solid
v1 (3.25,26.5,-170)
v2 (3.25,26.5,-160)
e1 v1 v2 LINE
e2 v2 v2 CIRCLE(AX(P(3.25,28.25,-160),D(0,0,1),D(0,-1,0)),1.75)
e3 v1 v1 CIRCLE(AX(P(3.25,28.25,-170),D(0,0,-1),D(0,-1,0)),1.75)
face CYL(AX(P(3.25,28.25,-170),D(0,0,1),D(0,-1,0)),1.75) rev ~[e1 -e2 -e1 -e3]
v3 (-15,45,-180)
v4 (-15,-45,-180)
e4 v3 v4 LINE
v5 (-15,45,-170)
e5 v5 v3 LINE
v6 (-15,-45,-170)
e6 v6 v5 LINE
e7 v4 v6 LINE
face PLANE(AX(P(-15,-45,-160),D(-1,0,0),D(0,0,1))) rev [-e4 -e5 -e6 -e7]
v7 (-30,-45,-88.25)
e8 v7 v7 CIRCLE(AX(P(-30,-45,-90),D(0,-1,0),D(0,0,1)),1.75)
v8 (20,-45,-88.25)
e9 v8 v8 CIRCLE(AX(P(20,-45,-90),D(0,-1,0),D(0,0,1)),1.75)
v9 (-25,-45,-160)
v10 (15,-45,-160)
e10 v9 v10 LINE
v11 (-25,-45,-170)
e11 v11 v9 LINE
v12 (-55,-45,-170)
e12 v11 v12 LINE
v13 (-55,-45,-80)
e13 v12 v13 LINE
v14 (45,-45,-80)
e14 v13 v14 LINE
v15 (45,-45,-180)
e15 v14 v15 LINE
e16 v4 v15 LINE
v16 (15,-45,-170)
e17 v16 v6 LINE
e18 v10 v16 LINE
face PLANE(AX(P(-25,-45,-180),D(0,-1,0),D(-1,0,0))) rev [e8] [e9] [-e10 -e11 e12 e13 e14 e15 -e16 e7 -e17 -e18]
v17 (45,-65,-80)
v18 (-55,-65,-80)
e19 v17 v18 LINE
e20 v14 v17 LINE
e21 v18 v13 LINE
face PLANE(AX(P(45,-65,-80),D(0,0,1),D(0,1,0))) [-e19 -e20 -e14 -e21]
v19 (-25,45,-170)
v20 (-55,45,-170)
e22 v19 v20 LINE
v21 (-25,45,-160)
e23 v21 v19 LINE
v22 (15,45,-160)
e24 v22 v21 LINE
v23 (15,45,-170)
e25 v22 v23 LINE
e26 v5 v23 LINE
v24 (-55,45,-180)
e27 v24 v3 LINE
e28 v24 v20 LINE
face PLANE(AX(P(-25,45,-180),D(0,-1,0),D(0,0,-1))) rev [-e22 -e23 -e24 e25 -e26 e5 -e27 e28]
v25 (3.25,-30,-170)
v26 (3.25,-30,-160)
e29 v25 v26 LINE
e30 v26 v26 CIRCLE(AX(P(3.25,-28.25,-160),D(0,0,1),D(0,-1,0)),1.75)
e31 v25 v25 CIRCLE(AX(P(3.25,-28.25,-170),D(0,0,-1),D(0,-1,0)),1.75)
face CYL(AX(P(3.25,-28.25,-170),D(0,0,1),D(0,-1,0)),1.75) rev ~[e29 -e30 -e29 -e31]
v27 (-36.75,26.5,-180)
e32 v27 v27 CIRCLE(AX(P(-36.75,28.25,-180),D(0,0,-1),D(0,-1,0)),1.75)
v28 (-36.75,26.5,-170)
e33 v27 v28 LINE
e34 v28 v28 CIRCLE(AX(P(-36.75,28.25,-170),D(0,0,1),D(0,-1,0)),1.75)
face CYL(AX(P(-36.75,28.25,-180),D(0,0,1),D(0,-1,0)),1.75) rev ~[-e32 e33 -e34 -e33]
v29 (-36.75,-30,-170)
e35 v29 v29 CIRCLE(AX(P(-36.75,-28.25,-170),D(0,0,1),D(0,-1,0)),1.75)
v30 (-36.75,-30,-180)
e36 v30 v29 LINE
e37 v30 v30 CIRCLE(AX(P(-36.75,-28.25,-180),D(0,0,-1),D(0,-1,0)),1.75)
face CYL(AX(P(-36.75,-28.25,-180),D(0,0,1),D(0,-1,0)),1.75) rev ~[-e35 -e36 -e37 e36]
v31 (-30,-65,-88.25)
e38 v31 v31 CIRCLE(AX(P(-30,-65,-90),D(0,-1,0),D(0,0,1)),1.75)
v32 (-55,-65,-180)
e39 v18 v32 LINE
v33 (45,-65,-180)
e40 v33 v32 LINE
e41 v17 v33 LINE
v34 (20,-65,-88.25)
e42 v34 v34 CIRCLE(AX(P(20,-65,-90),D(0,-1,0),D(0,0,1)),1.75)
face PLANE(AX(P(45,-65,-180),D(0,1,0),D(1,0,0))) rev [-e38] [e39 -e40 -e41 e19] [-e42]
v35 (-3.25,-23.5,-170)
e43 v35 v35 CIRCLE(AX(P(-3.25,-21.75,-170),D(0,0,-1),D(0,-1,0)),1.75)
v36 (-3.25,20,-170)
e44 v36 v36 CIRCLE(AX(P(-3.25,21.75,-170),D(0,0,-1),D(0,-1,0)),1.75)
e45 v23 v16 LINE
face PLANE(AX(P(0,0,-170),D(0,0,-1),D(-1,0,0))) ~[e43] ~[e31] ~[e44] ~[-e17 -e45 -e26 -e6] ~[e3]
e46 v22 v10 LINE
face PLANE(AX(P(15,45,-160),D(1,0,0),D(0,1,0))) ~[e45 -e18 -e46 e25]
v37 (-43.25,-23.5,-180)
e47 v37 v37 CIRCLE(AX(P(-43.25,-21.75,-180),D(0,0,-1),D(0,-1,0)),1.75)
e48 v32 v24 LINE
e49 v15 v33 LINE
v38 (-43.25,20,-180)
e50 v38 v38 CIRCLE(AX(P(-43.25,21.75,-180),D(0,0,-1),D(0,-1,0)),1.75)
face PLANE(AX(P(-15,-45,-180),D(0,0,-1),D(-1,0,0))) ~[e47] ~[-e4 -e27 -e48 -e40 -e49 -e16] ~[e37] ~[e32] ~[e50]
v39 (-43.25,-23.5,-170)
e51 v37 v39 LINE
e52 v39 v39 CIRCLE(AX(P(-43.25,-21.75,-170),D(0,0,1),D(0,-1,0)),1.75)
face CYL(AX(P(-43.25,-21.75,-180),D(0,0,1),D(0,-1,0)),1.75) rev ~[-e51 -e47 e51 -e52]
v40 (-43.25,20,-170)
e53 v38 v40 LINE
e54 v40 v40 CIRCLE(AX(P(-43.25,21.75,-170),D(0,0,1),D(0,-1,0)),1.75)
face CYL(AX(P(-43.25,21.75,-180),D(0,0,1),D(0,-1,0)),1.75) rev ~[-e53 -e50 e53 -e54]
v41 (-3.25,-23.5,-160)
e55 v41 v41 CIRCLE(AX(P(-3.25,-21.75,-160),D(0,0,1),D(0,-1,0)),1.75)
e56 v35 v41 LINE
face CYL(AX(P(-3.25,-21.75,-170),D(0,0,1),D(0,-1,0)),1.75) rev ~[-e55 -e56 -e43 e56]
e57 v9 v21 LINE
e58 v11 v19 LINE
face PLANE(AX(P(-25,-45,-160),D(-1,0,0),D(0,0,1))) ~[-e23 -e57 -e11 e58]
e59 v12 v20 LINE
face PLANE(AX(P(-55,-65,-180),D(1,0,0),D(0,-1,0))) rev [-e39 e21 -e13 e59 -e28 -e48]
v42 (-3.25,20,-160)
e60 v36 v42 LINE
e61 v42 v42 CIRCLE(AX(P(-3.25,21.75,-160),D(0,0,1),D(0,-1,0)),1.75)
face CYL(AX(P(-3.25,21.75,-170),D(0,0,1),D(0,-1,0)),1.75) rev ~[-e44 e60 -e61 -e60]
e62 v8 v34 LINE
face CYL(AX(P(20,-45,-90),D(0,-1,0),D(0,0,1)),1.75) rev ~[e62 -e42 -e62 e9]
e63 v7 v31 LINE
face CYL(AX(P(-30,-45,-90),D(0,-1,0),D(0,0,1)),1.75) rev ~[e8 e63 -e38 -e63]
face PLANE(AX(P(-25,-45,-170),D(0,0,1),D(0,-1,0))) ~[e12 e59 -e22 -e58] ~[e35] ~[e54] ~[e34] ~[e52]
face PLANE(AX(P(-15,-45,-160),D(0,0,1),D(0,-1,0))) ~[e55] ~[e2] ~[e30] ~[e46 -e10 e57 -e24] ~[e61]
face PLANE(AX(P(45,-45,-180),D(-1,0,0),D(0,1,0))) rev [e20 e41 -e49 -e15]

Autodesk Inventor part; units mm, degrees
ref_plane "YZ Plane" through (0, 0, 0) normal (1, 0, 0) x (0, 1, 0)
ref_plane "XZ Plane" through (0, 0, 0) normal (0, 1, 0) x (-1, 0, 0)
ref_plane "XY Plane" through (0, 0, 0) normal (0, 0, 1) x (1, 0, 0)
sketch "Boceto1" plane through (0, 0, 0) normal (0, 0, 1) x (1, 0, 0)
  line L0 (-15, 45) -> (15, 45)
  line L1 (15, 45) -> (15, -45)
  line L2 (15, -45) -> (-15, -45)
  line L3 (-15, -45) -> (-15, 45)
  line L4 (-15, 45) -> (15, -45) construction
  line L5 (15, 45) -> (-15, -45) construction
  point P0 (0, 0)
  dimension "d0" = 30
  dimension "d1" = 90
extrude "Extrusión1" add sketch "Boceto1" along normal blind 10
sketch "Boceto2" plane through (0, 0, 10) normal (0, 0, 1) x (1, 0, 0)
  line L0 (15, 45) -> (15, -45)
  line L1 (5, 30) -> (5, 20)
  line L2 (-5, 30) -> (5, 30)
  line L3 (5, 20) -> (-5, 30) construction
  line L4 (5, 20) -> (-5, 20)
  line L5 (-5, 20) -> (5, 30) construction
  line L6 (-5, 20) -> (-5, 30)
  line L7 (24, 0) -> (9, 0)
  line L8 (-15, -45) -> (15, -45)
  line L9 (5, 25) -> (5.4102, 25)
  circle A0 centre (-3.25, 21.75) radius 1.75
  circle A1 centre (3.25, 28.25) radius 1.75
  line L10 (5, -20) -> (-5, -20)
  circle A2 centre (-3.25, -21.75) radius 1.75
  line L11 (5, -25) -> (5.4102, -25)
  line L12 (5, -30) -> (5, -20)
  line L13 (-5, -30) -> (5, -30)
  line L14 (5, -20) -> (-5, -30) construction
  line L15 (-5, -20) -> (5, -30) construction
  line L16 (-5, -20) -> (-5, -30)
  circle A3 centre (3.25, -28.25) radius 1.75
  line L17 (-15, -45) -> (-15, 45)
  line L18 (15, -45) -> (15, 45) projected
  line L19 (-15, -45) -> (15, -45) projected
  line L20 (-15, 45) -> (15, 45)
  line L21 (-3.25, 28.25) -> (3.25, 21.75)
  line L22 (-3.25, 21.75) -> (3.25, 28.25)
  point P0 (0, 0)
  point P1 (-113, 215)
  point P2 (-5, 25)
  point P3 (-3.25, -21.75)
  point P4 (3.25, -28.25)
  point P5 (-143, 115)
  point P6 (-3.25, -21.75)
  point P7 (-5, -25)
  point P8 (3.25, -28.25)
  point P9 (0, 25)
  point P10 (0, -25)
  dimension "d4" = 1.75
  dimension "d5" = 1.75
  dimension "d6" = 1.75
  dimension "d7" = 1.75
  dimension "d8" = 10
  dimension "d9" = 10
  dimension "d10" = 10
  dimension "d11" = 15
  dimension "d12" = 0
  dimension "d13" = 30
  dimension "d14" = 0
  dimension "d15" = 90
  dimension "d16" = 15
hole "Agujero1" at (3.25, 28.25, 10) at (-3.25, 21.75, 10) at (-3.25, -21.75, 10) at (3.25, -28.25, 10) direction (0, 0, -1) diameter 3.5 end through all
sketch "Boceto3" plane through (-15, -45, 0) normal (-1, 0, 0) x (0, 0, 1)
  line L0 (0, 0) -> (0, 90) projected
  line L1 (0, 90) -> (20, 90)
  line L2 (20, 90) -> (20, 0)
  line L3 (20, 0) -> (0, 0)
  line L4 (0, 0) -> (0, 90)
  point P0 (0, 45)
  dimension "d24" = 20
  dimension "d25" = 90
extrude "Extrusión2" add sketch "Boceto3" along normal blind 10
sketch "Boceto4" plane through (-25, -45, 0) normal (-1, 0, 0) x (0, 0, 1)
  line L0 (20, 90) -> (10, 90) projected
  line L1 (10, 0) -> (10, 90) projected
  line L2 (20, 90) -> (10, 90)
  line L3 (10, 90) -> (10, 0)
  line L4 (10, 0) -> (20, 0)
  line L5 (20, 0) -> (20, 90)
  point P0 (0, 45)
extrude "Extrusión3" add sketch "Boceto4" along normal blind 30
sketch "Boceto5" plane through (-15, -45, 20) normal (0, 0, 1) x (1, 0, 0)
  line L0 (-40, 0) -> (-70, 90)
  line L1 (-70, 90) -> (-40, 0)
  line L2 (-20, 75) -> (-20, 65)
  line L3 (-30, 75) -> (-20, 75)
  line L4 (-20, 65) -> (-30, 75) construction
  line L5 (-20, 65) -> (-30, 65)
  line L6 (-30, 65) -> (-20, 75) construction
  circle A0 centre (-28.25, 66.75) radius 1.75
  line L7 (-30, 65) -> (-30, 75)
  circle A1 centre (-21.75, 73.25) radius 1.75
  line L8 (-40, -20) -> (-40, 90)
  line L9 (-55, 45) -> (-143, 45)
  line L10 (-20, 25) -> (-30, 25)
  circle A2 centre (-28.25, 23.25) radius 1.75
  line L11 (-20, 15) -> (-20, 25)
  line L12 (-20, 25) -> (-30, 15) construction
  line L13 (-30, 25) -> (-20, 15) construction
  line L14 (-30, 25) -> (-30, 15)
  line L15 (-30, 15) -> (-20, 15)
  circle A3 centre (-21.75, 16.75) radius 1.75
  line L16 (-70, 0) -> (-40, 0)
  line L17 (0, 0) -> (-40, 0) projected
  line L18 (-40, 90) -> (-70, 90)
  line L19 (-40, 0) -> (-40, 90) projected
  point P0 (15, 45)
  point P1 (-30, 70)
  point P2 (-20, 70)
  point P3 (-20, 20)
  point P4 (-30, 20)
  point P5 (-55, 0)
  point P6 (-55, 90)
  dimension "d30" = 3.5
  dimension "d31" = 1.75
  dimension "d32" = 1.75
  dimension "d33" = 1.75
  dimension "d34" = 1.75
  dimension "d35" = 10
  dimension "d36" = 10
  dimension "d38" = 10
  dimension "d39" = -41.1096
  dimension "d40" = 15
  dimension "d41" = 0
  dimension "d42" = 15
  dimension "d43" = 90
  dimension "d45" = 0
hole "Agujero2" at (-36.75, 28.25, 20) at (-43.25, 21.75, 20) at (-43.25, -21.75, 20) at (-36.75, -28.25, 20) direction (0, 0, -1) diameter 3.5 end through all
sketch "Boceto6" plane through (-15, -45, 20) normal (0, 0, 1) x (1, 0, 0)
  line L0 (-10, 0) -> (-40, 0) projected
  line L1 (-40, 0) -> (60, 0)
  line L2 (60, 0) -> (60, -20)
  line L3 (60, -20) -> (-40, -20)
  line L4 (-40, -20) -> (-40, 0)
  point P0 (15, 45)
  dimension "d53" = 20
extrude "Extrusión4" add sketch "Boceto6" against normal blind 100
mirror "Simetría1" about plane through (-5, -55, -80) normal (0, 0, -1) of "Extrusión1", "Agujero1", "Extrusión2", "Agujero2", "Extrusión3", "Extrusión4"
ref_plane "Plano de trabajo2" through (45, -65, -80) normal (0, 0, -1) x (-1, 0, 0)
sketch "Boceto7" plane through (-15, -45, 20) normal (0, 1, 0) x (1, 0, 0)
  line L0 (30, 115) -> (30, 85)
  circle A0 centre (35, 90) radius 1.75
  line L1 (30, 85) -> (40, 85)
  line L2 (35, 110) -> (35, 90)
  circle A1 centre (35, 110) radius 1.75
  line L3 (40, 115) -> (30, 85) construction
  line L4 (40, 115) -> (30, 115)
  line L5 (30, 115) -> (40, 85) construction
  line L6 (40, 85) -> (40, 115)
  line L7 (60, 0) -> (60, 200) projected
  line L8 (-40, 0) -> (60, 0) projected
  line L9 (10, 0) -> (10, 134.4524)
  line L10 (-10, 115) -> (-10, 85)
  circle A2 centre (-15, 110) radius 1.75
  line L11 (-20, 115) -> (-10, 115)
  circle A3 centre (-15, 90) radius 1.75
  line L12 (-10, 85) -> (-20, 85)
  line L13 (-20, 115) -> (-10, 85) construction
  line L14 (-10, 115) -> (-20, 85) construction
  line L15 (-20, 85) -> (-20, 115)
  line L16 (-15, 110) -> (-15, 90)
  point P0 (15, 20)
  point P1 (189.1833, 40)
  point P2 (35, 115)
  point P3 (-85.8367, 100)
  point P4 (235.02, 100)
  point P5 (-15, 115)
  dimension "d56" = 5
  dimension "d57" = 5
  dimension "d58" = 3.5
  dimension "d59" = 5
  dimension "d60" = 5
  dimension "d61" = 10
  dimension "d62" = 30
  dimension "d64" = 20
hole "Agujero3" at (-30, -45, -90) at (-30, -45, -70) at (20, -45, -90) at (20, -45, -70) direction (0, -1, 0) diameter 3.5 end through all
split "Dividir1" plane through (45, -65, -80) removes the side toward (0, 0, 1)
properties part number "container_mid_1"
